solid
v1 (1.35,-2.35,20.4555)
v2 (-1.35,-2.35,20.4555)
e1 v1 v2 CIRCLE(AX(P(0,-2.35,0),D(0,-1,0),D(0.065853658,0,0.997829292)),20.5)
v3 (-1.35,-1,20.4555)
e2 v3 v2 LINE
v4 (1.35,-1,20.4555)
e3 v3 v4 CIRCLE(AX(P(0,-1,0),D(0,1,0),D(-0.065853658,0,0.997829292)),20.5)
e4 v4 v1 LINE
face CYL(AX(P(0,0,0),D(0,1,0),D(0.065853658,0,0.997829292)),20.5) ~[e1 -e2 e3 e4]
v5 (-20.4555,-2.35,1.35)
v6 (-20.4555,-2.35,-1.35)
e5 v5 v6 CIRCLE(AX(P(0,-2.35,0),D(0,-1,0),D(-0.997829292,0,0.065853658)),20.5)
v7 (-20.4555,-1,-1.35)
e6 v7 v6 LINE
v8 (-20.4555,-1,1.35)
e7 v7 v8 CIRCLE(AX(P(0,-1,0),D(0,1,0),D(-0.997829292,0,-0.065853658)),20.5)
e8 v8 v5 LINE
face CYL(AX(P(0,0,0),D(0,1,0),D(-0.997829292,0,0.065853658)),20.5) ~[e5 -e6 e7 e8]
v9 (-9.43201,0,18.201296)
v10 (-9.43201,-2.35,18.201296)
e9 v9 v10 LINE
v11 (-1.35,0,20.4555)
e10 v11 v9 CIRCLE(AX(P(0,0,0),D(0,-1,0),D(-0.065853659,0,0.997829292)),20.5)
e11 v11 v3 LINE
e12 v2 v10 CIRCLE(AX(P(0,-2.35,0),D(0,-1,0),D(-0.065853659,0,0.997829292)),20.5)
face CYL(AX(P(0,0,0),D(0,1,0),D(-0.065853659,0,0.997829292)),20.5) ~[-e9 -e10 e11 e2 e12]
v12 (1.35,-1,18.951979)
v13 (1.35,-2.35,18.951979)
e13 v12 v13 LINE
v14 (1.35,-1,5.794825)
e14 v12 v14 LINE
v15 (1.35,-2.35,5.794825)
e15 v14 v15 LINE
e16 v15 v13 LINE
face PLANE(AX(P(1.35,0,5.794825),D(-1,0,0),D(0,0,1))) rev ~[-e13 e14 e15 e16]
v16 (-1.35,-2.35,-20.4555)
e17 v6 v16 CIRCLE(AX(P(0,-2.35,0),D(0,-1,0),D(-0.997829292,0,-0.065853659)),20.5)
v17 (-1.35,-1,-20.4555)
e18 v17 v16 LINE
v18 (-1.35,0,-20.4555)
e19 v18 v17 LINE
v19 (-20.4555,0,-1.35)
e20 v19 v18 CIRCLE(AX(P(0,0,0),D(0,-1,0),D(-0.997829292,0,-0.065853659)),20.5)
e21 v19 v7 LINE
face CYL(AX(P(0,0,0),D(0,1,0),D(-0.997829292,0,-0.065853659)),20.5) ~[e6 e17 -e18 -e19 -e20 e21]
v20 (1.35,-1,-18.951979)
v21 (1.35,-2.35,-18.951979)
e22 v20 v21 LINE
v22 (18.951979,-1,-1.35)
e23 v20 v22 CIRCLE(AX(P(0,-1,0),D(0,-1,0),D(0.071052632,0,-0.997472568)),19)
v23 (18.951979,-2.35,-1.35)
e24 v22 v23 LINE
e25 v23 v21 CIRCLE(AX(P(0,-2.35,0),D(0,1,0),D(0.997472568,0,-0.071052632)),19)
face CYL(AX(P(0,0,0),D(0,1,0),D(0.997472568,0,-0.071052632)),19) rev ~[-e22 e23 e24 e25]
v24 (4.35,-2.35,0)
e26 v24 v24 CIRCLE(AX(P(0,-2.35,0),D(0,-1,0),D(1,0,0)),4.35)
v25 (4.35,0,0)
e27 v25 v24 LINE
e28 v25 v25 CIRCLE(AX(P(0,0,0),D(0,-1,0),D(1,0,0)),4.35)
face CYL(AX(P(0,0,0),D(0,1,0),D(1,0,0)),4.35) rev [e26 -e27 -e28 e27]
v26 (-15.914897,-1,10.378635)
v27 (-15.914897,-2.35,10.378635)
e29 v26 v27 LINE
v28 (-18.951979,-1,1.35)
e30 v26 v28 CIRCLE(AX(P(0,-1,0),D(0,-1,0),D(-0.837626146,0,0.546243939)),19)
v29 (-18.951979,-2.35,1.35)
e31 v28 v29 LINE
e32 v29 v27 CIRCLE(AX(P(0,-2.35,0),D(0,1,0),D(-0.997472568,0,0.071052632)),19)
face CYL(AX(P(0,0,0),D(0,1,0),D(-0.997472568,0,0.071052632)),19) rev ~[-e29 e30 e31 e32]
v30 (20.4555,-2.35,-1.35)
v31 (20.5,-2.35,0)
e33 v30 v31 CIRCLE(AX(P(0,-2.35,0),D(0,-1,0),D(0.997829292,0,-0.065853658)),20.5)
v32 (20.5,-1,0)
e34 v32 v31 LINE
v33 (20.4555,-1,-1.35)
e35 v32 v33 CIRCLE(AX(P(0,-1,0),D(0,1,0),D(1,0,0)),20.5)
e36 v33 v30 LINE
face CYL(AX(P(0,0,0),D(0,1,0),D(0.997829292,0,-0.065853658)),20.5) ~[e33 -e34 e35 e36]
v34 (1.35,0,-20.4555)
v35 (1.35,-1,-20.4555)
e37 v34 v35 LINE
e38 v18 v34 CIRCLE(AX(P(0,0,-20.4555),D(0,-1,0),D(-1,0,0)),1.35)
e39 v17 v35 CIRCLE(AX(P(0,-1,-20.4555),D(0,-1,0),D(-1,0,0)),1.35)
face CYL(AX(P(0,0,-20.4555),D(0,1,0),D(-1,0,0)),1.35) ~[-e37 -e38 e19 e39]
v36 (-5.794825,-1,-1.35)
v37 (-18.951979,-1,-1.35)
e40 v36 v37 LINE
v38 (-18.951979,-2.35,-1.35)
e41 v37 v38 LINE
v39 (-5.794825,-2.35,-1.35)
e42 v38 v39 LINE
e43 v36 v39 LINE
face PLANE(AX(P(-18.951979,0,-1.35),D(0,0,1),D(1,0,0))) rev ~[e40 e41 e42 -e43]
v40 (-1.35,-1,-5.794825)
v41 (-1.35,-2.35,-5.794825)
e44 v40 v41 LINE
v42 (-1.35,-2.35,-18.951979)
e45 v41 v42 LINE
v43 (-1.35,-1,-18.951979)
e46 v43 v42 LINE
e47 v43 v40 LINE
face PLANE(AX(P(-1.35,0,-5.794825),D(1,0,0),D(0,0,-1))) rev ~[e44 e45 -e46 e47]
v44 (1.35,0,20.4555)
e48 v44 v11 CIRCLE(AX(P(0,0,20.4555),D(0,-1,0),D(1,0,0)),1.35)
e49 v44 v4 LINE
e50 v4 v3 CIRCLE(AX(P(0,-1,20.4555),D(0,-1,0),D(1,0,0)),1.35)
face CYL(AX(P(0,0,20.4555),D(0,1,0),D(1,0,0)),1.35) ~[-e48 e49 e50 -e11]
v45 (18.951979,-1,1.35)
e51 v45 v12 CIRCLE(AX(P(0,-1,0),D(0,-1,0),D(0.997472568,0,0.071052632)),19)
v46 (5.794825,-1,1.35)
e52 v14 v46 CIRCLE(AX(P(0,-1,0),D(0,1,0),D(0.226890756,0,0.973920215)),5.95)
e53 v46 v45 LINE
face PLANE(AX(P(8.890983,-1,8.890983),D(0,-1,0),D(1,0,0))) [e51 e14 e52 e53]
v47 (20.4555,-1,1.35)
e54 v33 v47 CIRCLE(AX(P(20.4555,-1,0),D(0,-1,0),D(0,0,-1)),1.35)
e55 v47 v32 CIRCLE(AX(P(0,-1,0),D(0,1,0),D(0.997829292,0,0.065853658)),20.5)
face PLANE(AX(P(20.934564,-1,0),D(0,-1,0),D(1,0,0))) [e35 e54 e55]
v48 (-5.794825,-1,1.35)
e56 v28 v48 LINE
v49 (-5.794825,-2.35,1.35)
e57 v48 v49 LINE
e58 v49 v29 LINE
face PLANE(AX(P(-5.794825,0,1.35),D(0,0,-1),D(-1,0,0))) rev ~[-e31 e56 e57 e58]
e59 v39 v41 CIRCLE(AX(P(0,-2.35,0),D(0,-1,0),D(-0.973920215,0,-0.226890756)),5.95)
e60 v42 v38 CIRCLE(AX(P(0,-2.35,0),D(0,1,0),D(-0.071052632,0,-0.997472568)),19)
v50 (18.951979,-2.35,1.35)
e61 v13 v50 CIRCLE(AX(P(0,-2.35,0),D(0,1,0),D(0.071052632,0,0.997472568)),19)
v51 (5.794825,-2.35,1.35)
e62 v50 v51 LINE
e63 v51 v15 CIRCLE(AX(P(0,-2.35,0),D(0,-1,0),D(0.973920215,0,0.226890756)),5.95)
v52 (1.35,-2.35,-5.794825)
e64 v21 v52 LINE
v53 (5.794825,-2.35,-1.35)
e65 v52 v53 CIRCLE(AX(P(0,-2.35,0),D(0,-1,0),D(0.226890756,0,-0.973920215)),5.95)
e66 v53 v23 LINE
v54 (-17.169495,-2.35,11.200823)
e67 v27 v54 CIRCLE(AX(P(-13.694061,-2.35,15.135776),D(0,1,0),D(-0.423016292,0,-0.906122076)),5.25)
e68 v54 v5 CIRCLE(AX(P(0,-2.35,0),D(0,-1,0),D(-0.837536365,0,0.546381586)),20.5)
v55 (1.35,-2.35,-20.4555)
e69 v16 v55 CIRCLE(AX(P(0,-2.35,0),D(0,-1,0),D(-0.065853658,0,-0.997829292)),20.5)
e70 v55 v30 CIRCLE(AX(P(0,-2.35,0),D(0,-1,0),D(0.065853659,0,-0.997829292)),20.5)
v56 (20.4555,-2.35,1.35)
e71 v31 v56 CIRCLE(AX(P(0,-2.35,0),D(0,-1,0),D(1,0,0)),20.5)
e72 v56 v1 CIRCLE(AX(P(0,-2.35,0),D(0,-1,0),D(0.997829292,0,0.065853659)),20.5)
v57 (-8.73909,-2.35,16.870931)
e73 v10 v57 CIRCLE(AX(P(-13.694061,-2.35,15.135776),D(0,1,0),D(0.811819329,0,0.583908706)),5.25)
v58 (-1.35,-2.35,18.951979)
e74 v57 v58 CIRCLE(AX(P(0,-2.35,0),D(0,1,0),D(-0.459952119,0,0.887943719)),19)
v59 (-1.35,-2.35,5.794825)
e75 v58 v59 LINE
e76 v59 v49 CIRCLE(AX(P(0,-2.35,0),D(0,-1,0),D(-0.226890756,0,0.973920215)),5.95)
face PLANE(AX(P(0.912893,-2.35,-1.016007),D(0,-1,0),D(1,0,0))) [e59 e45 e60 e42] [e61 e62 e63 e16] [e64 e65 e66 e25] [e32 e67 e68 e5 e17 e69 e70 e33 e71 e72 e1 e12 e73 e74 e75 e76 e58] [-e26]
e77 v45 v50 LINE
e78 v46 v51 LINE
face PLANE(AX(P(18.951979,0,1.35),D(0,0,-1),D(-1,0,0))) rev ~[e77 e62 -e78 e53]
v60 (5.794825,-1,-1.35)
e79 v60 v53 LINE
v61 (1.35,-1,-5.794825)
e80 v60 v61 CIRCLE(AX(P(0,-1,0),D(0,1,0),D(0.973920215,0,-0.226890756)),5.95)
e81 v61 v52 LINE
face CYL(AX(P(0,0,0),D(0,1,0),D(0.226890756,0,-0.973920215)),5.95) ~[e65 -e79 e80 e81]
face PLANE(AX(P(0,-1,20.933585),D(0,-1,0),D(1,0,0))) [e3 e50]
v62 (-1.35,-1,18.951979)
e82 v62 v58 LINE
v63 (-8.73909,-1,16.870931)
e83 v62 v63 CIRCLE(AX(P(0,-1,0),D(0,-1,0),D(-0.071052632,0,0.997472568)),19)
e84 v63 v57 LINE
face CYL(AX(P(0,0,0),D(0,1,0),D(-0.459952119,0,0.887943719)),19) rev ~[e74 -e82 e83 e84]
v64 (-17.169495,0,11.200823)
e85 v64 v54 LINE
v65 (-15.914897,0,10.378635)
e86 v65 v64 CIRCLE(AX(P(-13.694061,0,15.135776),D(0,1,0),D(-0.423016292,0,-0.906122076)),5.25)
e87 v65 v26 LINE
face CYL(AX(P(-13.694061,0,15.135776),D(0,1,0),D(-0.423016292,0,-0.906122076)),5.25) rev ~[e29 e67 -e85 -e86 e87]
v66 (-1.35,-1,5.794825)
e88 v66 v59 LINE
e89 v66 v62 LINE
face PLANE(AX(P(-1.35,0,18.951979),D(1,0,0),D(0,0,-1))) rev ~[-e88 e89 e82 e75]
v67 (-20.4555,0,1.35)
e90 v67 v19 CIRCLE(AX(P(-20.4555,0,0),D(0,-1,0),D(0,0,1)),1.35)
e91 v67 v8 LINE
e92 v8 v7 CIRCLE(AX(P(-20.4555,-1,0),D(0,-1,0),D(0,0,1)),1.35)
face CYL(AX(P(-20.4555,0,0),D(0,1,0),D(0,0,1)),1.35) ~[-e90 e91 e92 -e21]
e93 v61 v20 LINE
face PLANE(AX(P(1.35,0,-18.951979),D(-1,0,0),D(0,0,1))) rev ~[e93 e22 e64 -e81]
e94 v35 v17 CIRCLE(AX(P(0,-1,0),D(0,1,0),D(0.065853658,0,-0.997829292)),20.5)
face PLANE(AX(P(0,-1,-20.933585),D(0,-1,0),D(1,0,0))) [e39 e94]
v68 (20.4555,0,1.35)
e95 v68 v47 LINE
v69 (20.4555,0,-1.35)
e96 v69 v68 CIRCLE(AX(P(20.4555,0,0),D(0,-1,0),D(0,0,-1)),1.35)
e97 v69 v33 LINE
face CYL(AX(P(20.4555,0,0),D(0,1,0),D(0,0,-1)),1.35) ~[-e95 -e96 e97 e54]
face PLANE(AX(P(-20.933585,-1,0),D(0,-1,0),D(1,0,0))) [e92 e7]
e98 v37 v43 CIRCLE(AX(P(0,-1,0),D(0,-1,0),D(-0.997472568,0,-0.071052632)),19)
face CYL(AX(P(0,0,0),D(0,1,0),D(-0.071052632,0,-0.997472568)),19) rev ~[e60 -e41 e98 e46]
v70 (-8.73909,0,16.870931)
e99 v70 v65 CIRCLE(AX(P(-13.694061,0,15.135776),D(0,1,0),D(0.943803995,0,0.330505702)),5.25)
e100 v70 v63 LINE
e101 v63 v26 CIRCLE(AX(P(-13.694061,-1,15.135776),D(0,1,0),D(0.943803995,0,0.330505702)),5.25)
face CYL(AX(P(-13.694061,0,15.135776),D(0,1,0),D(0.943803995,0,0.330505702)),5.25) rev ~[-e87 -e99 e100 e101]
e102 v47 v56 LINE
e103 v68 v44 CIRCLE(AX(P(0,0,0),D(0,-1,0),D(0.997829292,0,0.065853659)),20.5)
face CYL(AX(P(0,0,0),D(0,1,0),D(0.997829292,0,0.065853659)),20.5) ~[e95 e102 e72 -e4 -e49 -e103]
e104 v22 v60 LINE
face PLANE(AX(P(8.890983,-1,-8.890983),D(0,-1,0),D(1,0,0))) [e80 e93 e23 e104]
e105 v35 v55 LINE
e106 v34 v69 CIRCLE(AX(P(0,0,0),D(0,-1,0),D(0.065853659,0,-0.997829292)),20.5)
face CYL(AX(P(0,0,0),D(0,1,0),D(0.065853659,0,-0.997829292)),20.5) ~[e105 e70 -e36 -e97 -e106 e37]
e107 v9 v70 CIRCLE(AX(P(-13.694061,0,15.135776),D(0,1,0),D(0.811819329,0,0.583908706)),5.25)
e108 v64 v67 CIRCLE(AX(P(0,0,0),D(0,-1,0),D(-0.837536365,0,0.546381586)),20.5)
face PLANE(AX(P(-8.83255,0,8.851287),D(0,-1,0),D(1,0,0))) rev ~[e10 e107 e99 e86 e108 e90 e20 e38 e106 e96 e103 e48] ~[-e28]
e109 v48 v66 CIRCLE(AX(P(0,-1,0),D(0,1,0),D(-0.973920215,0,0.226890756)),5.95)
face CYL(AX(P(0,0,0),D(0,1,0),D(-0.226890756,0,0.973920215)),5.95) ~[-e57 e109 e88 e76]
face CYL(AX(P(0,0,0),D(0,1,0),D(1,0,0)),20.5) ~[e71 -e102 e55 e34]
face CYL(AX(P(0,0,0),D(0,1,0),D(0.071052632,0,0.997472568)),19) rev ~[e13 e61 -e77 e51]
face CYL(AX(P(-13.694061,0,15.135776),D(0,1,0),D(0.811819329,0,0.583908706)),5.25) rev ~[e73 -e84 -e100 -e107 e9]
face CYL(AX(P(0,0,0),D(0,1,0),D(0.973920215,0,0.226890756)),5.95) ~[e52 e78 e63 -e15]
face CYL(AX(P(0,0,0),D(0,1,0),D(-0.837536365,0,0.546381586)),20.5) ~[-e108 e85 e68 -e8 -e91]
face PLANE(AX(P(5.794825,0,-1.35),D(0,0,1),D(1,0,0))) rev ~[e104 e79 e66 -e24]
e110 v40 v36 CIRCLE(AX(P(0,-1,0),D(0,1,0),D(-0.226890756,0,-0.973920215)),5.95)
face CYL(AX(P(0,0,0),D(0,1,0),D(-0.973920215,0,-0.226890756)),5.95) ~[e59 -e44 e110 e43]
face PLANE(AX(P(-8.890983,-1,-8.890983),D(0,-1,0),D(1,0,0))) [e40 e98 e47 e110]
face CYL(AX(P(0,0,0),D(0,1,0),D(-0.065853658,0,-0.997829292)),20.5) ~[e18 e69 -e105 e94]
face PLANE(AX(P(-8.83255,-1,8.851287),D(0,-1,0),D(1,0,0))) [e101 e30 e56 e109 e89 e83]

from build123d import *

# Parameters (mm, degrees)
F0_R     = 4.35
F1_DEPTH = 2.35
F2_DEPTH = 1
F3_DEPTH = 25


# Not quite as in the source:
# - a feature names something its author has since deleted; it is built from what else it names


with BuildPart() as f1:
    # F0 (on Front) → F1 (new body)
    with BuildSketch(Plane.XZ):
        with BuildLine():
            ThreePointArc((18.9519787885, 1.35), (18.9879909019, 0.6754269088), (19, 0))
            ThreePointArc((19, 0), (18.9879909019, -0.6754269088), (18.9519787885, -1.35))
            ThreePointArc((18.9519787885, -1.35), (13.4350288425, -13.4350288425), (1.35, -18.9519787885))
            ThreePointArc((1.35, -18.9519787885), (0, -19), (-1.35, -18.9519787885))
            ThreePointArc((-1.35, -18.9519787885), (-13.4350288425, -13.4350288425), (-18.9519787885, -1.35))
            ThreePointArc((-18.9519787885, -1.35), (-19, 0), (-18.9519787885, 1.35))
            ThreePointArc((-18.9519787885, 1.35), (-18.0084373125, 6.0577376603), (-15.9148967645, 10.378634832))
            ThreePointArc((-15.9148967645, 10.378634832), (-16.5717114004, 10.7446905008), (-17.1694954771, 11.2008225173))
            ThreePointArc((-17.1694954771, 11.2008225173), (-19.4465872664, 6.4869286792), (-20.4555004828, 1.35))
            ThreePointArc((-20.4555004828, 1.35), (-20.5, 0), (-20.4555004828, -1.35))
            ThreePointArc((-20.4555004828, -1.35), (-14.4956890143, -14.4956890143), (-1.35, -20.4555004828))
            ThreePointArc((-1.35, -20.4555004828), (0, -20.5), (1.35, -20.4555004828))
            ThreePointArc((1.35, -20.4555004828), (14.4956890143, -14.4956890143), (20.4555004828, -1.35))
            ThreePointArc((20.4555004828, -1.35), (20.4888721004, -0.6753666055), (20.5, 0))
            ThreePointArc((20.5, 0), (20.4888721004, 0.6753666055), (20.4555004828, 1.35))
            ThreePointArc((20.4555004828, 1.35), (14.4956890143, 14.4956890143), (1.35, 20.4555004828))
            ThreePointArc((1.35, 20.4555004828), (0, 20.5), (-1.35, 20.4555004828))
            ThreePointArc((-1.35, 20.4555004828), (-5.5075668443, 19.7463087046), (-9.4320097524, 18.2012964382))
            ThreePointArc((-9.4320097524, 18.2012964382), (-9.0377919084, 17.5609883013), (-8.7390902551, 16.8709306653))
            ThreePointArc((-8.7390902551, 16.8709306653), (-5.1507403222, 18.2885175488), (-1.35, 18.9519787885))
            ThreePointArc((-1.35, 18.9519787885), (0, 19), (1.35, 18.9519787885))
            ThreePointArc((1.35, 18.9519787885), (13.4350288425, 13.4350288425), (18.9519787885, 1.35))
        make_face()
        with BuildLine():
            ThreePointArc((-1.35, -18.9519787885), (0, -19), (1.35, -18.9519787885))
            Line((1.35, -18.9519787885), (1.35, -5.7948252778))
            ThreePointArc((1.35, -5.7948252778), (0, -5.95), (-1.35, -5.7948252778))
            Line((-1.35, -5.7948252778), (-1.35, -18.9519787885))
        make_face()
        with BuildLine():
            ThreePointArc((18.9519787885, -1.35), (18.9879909019, -0.6754269088), (19, 0))
            ThreePointArc((19, 0), (18.9879909019, 0.6754269088), (18.9519787885, 1.35))
            Line((18.9519787885, 1.35), (5.7948252778, 1.35))
            ThreePointArc((5.7948252778, 1.35), (5.9110790218, 0.6794444779), (5.95, 0))
            ThreePointArc((5.95, 0), (5.9110790218, -0.6794444779), (5.7948252778, -1.35))
            Line((5.7948252778, -1.35), (18.9519787885, -1.35))
        make_face()
        with BuildLine():
            ThreePointArc((-18.9519787885, 1.35), (-19, 0), (-18.9519787885, -1.35))
            Line((-18.9519787885, -1.35), (-5.7948252778, -1.35))
            ThreePointArc((-5.7948252778, -1.35), (-5.95, 0), (-5.7948252778, 1.35))
            Line((-5.7948252778, 1.35), (-18.9519787885, 1.35))
        make_face()
        with BuildLine():
            Line((1.35, 5.7948252778), (1.35, 18.9519787885))
            ThreePointArc((1.35, 18.9519787885), (0, 19), (-1.35, 18.9519787885))
            Line((-1.35, 18.9519787885), (-1.35, 5.7948252778))
            ThreePointArc((-1.35, 5.7948252778), (0, 5.95), (1.35, 5.7948252778))
        make_face()
        with BuildLine():
            ThreePointArc((5.95, 0), (5.9110790218, 0.6794444779), (5.7948252778, 1.35))
            ThreePointArc((5.7948252778, 1.35), (4.2072853481, 4.2072853481), (1.35, 5.7948252778))
            ThreePointArc((1.35, 5.7948252778), (0, 5.95), (-1.35, 5.7948252778))
            ThreePointArc((-1.35, 5.7948252778), (-4.2072853481, 4.2072853481), (-5.7948252778, 1.35))
            ThreePointArc((-5.7948252778, 1.35), (-5.95, 0), (-5.7948252778, -1.35))
            ThreePointArc((-5.7948252778, -1.35), (-4.2072853481, -4.2072853481), (-1.35, -5.7948252778))
            ThreePointArc((-1.35, -5.7948252778), (0, -5.95), (1.35, -5.7948252778))
            ThreePointArc((1.35, -5.7948252778), (4.2072853481, -4.2072853481), (5.7948252778, -1.35))
            ThreePointArc((5.7948252778, -1.35), (5.9110790218, -0.6794444779), (5.95, 0))
        make_face()
        Circle(F0_R, mode=Mode.SUBTRACT)
    extrude(amount=F1_DEPTH)

    # F0 (on Front) → F2 (join)
    with BuildSketch(Plane.XZ):
        with BuildLine():
            Line((-1.35, 5.7948252778), (-1.35, 18.9519787885))
            ThreePointArc((-1.35, 18.9519787885), (-5.1507403222, 18.2885175488), (-8.7390902551, 16.8709306653))
            ThreePointArc((-8.7390902551, 16.8709306653), (-10.1717962693, 11.2426857548), (-15.9148967645, 10.378634832))
            ThreePointArc((-15.9148967645, 10.378634832), (-18.0084373125, 6.0577376603), (-18.9519787885, 1.35))
            Line((-18.9519787885, 1.35), (-5.7948252778, 1.35))
            ThreePointArc((-5.7948252778, 1.35), (-4.2072853481, 4.2072853481), (-1.35, 5.7948252778))
        make_face()
        with BuildLine():
            ThreePointArc((1.35, -18.9519787885), (13.4350288425, -13.4350288425), (18.9519787885, -1.35))
            Line((18.9519787885, -1.35), (5.7948252778, -1.35))
            ThreePointArc((5.7948252778, -1.35), (4.2072853481, -4.2072853481), (1.35, -5.7948252778))
            Line((1.35, -5.7948252778), (1.35, -18.9519787885))
        make_face()
        with BuildLine():
            Line((5.7948252778, 1.35), (18.9519787885, 1.35))
            ThreePointArc((18.9519787885, 1.35), (13.4350288425, 13.4350288425), (1.35, 18.9519787885))
            Line((1.35, 18.9519787885), (1.35, 5.7948252778))
            ThreePointArc((1.35, 5.7948252778), (4.2072853481, 4.2072853481), (5.7948252778, 1.35))
        make_face()
        with BuildLine():
            ThreePointArc((-18.9519787885, -1.35), (-13.4350288425, -13.4350288425), (-1.35, -18.9519787885))
            Line((-1.35, -18.9519787885), (-1.35, -5.7948252778))
            ThreePointArc((-1.35, -5.7948252778), (-4.2072853481, -4.2072853481), (-5.7948252778, -1.35))
            Line((-5.7948252778, -1.35), (-18.9519787885, -1.35))
        make_face()
        with BuildLine():
            ThreePointArc((-20.4555004828, -1.35), (-20.5, 0), (-20.4555004828, 1.35))
            ThreePointArc((-20.4555004828, 1.35), (-21.8055004828, 0), (-20.4555004828, -1.35))
        make_face()
        with BuildLine():
            ThreePointArc((1.35, -20.4555004828), (0, -20.5), (-1.35, -20.4555004828))
            ThreePointArc((-1.35, -20.4555004828), (0, -21.8055004828), (1.35, -20.4555004828))
        make_face()
        with BuildLine():
            ThreePointArc((20.4555004828, -1.35), (21.8055004828, 0), (20.4555004828, 1.35))
            ThreePointArc((20.4555004828, 1.35), (20.4888721004, 0.6753666055), (20.5, 0))
            ThreePointArc((20.5, 0), (20.4888721004, -0.6753666055), (20.4555004828, -1.35))
        make_face()
        with BuildLine():
            ThreePointArc((1.35, 20.4555004828), (0, 21.8055004828), (-1.35, 20.4555004828))
            ThreePointArc((-1.35, 20.4555004828), (0, 20.5), (1.35, 20.4555004828))
        make_face()
    extrude(amount=F2_DEPTH)

    # F0 (on Front) → F3 (cut)
    with BuildSketch(Plane.XZ):
        with BuildLine():
            ThreePointArc((18.9519787885, 1.35), (18.9879909019, 0.6754269088), (19, 0))
            ThreePointArc((19, 0), (18.9879909019, -0.6754269088), (18.9519787885, -1.35))
            ThreePointArc((18.9519787885, -1.35), (13.4350288425, -13.4350288425), (1.35, -18.9519787885))
            ThreePointArc((1.35, -18.9519787885), (0, -19), (-1.35, -18.9519787885))
            ThreePointArc((-1.35, -18.9519787885), (-13.4350288425, -13.4350288425), (-18.9519787885, -1.35))
            ThreePointArc((-18.9519787885, -1.35), (-19, 0), (-18.9519787885, 1.35))
            ThreePointArc((-18.9519787885, 1.35), (-18.0084373125, 6.0577376603), (-15.9148967645, 10.378634832))
            ThreePointArc((-15.9148967645, 10.378634832), (-16.5717114004, 10.7446905008), (-17.1694954771, 11.2008225173))
            ThreePointArc((-17.1694954771, 11.2008225173), (-19.4465872664, 6.4869286792), (-20.4555004828, 1.35))
            ThreePointArc((-20.4555004828, 1.35), (-20.5, 0), (-20.4555004828, -1.35))
            ThreePointArc((-20.4555004828, -1.35), (-14.4956890143, -14.4956890143), (-1.35, -20.4555004828))
            ThreePointArc((-1.35, -20.4555004828), (0, -20.5), (1.35, -20.4555004828))
            ThreePointArc((1.35, -20.4555004828), (14.4956890143, -14.4956890143), (20.4555004828, -1.35))
            ThreePointArc((20.4555004828, -1.35), (20.4888721004, -0.6753666055), (20.5, 0))
            ThreePointArc((20.5, 0), (20.4888721004, 0.6753666055), (20.4555004828, 1.35))
            ThreePointArc((20.4555004828, 1.35), (14.4956890143, 14.4956890143), (1.35, 20.4555004828))
            ThreePointArc((1.35, 20.4555004828), (0, 20.5), (-1.35, 20.4555004828))
            ThreePointArc((-1.35, 20.4555004828), (-5.5075668443, 19.7463087046), (-9.4320097524, 18.2012964382))
            ThreePointArc((-9.4320097524, 18.2012964382), (-9.0377919084, 17.5609883013), (-8.7390902551, 16.8709306653))
            ThreePointArc((-8.7390902551, 16.8709306653), (-5.1507403222, 18.2885175488), (-1.35, 18.9519787885))
            ThreePointArc((-1.35, 18.9519787885), (0, 19), (1.35, 18.9519787885))
            ThreePointArc((1.35, 18.9519787885), (13.4350288425, 13.4350288425), (18.9519787885, 1.35))
        make_face()
        with BuildLine():
            ThreePointArc((-15.9148967645, 10.378634832), (-12.7472446155, 14.0892780054), (-8.7390902551, 16.8709306653))
            ThreePointArc((-8.7390902551, 16.8709306653), (-9.0377919084, 17.5609883013), (-9.4320097524, 18.2012964382))
            ThreePointArc((-9.4320097524, 18.2012964382), (-13.7536060325, 15.2015894268), (-17.1694954771, 11.2008225173))
            ThreePointArc((-17.1694954771, 11.2008225173), (-16.5717114004, 10.7446905008), (-15.9148967645, 10.378634832))
        make_face()
        with BuildLine():
            ThreePointArc((1.35, 20.4555004828), (0, 21.8055004828), (-1.35, 20.4555004828))
            ThreePointArc((-1.35, 20.4555004828), (0, 20.5), (1.35, 20.4555004828))
        make_face()
        with BuildLine():
            ThreePointArc((-20.4555004828, -1.35), (-20.5, 0), (-20.4555004828, 1.35))
            ThreePointArc((-20.4555004828, 1.35), (-21.8055004828, 0), (-20.4555004828, -1.35))
        make_face()
        with BuildLine():
            ThreePointArc((20.4555004828, -1.35), (21.8055004828, 0), (20.4555004828, 1.35))
            ThreePointArc((20.4555004828, 1.35), (20.4888721004, 0.6753666055), (20.5, 0))
            ThreePointArc((20.5, 0), (20.4888721004, -0.6753666055), (20.4555004828, -1.35))
        make_face()
        with BuildLine():
            ThreePointArc((1.35, -20.4555004828), (0, -20.5), (-1.35, -20.4555004828))
            ThreePointArc((-1.35, -20.4555004828), (0, -21.8055004828), (1.35, -20.4555004828))
        make_face()
    extrude(amount=-F3_DEPTH, mode=Mode.SUBTRACT)


solid = f1.part
